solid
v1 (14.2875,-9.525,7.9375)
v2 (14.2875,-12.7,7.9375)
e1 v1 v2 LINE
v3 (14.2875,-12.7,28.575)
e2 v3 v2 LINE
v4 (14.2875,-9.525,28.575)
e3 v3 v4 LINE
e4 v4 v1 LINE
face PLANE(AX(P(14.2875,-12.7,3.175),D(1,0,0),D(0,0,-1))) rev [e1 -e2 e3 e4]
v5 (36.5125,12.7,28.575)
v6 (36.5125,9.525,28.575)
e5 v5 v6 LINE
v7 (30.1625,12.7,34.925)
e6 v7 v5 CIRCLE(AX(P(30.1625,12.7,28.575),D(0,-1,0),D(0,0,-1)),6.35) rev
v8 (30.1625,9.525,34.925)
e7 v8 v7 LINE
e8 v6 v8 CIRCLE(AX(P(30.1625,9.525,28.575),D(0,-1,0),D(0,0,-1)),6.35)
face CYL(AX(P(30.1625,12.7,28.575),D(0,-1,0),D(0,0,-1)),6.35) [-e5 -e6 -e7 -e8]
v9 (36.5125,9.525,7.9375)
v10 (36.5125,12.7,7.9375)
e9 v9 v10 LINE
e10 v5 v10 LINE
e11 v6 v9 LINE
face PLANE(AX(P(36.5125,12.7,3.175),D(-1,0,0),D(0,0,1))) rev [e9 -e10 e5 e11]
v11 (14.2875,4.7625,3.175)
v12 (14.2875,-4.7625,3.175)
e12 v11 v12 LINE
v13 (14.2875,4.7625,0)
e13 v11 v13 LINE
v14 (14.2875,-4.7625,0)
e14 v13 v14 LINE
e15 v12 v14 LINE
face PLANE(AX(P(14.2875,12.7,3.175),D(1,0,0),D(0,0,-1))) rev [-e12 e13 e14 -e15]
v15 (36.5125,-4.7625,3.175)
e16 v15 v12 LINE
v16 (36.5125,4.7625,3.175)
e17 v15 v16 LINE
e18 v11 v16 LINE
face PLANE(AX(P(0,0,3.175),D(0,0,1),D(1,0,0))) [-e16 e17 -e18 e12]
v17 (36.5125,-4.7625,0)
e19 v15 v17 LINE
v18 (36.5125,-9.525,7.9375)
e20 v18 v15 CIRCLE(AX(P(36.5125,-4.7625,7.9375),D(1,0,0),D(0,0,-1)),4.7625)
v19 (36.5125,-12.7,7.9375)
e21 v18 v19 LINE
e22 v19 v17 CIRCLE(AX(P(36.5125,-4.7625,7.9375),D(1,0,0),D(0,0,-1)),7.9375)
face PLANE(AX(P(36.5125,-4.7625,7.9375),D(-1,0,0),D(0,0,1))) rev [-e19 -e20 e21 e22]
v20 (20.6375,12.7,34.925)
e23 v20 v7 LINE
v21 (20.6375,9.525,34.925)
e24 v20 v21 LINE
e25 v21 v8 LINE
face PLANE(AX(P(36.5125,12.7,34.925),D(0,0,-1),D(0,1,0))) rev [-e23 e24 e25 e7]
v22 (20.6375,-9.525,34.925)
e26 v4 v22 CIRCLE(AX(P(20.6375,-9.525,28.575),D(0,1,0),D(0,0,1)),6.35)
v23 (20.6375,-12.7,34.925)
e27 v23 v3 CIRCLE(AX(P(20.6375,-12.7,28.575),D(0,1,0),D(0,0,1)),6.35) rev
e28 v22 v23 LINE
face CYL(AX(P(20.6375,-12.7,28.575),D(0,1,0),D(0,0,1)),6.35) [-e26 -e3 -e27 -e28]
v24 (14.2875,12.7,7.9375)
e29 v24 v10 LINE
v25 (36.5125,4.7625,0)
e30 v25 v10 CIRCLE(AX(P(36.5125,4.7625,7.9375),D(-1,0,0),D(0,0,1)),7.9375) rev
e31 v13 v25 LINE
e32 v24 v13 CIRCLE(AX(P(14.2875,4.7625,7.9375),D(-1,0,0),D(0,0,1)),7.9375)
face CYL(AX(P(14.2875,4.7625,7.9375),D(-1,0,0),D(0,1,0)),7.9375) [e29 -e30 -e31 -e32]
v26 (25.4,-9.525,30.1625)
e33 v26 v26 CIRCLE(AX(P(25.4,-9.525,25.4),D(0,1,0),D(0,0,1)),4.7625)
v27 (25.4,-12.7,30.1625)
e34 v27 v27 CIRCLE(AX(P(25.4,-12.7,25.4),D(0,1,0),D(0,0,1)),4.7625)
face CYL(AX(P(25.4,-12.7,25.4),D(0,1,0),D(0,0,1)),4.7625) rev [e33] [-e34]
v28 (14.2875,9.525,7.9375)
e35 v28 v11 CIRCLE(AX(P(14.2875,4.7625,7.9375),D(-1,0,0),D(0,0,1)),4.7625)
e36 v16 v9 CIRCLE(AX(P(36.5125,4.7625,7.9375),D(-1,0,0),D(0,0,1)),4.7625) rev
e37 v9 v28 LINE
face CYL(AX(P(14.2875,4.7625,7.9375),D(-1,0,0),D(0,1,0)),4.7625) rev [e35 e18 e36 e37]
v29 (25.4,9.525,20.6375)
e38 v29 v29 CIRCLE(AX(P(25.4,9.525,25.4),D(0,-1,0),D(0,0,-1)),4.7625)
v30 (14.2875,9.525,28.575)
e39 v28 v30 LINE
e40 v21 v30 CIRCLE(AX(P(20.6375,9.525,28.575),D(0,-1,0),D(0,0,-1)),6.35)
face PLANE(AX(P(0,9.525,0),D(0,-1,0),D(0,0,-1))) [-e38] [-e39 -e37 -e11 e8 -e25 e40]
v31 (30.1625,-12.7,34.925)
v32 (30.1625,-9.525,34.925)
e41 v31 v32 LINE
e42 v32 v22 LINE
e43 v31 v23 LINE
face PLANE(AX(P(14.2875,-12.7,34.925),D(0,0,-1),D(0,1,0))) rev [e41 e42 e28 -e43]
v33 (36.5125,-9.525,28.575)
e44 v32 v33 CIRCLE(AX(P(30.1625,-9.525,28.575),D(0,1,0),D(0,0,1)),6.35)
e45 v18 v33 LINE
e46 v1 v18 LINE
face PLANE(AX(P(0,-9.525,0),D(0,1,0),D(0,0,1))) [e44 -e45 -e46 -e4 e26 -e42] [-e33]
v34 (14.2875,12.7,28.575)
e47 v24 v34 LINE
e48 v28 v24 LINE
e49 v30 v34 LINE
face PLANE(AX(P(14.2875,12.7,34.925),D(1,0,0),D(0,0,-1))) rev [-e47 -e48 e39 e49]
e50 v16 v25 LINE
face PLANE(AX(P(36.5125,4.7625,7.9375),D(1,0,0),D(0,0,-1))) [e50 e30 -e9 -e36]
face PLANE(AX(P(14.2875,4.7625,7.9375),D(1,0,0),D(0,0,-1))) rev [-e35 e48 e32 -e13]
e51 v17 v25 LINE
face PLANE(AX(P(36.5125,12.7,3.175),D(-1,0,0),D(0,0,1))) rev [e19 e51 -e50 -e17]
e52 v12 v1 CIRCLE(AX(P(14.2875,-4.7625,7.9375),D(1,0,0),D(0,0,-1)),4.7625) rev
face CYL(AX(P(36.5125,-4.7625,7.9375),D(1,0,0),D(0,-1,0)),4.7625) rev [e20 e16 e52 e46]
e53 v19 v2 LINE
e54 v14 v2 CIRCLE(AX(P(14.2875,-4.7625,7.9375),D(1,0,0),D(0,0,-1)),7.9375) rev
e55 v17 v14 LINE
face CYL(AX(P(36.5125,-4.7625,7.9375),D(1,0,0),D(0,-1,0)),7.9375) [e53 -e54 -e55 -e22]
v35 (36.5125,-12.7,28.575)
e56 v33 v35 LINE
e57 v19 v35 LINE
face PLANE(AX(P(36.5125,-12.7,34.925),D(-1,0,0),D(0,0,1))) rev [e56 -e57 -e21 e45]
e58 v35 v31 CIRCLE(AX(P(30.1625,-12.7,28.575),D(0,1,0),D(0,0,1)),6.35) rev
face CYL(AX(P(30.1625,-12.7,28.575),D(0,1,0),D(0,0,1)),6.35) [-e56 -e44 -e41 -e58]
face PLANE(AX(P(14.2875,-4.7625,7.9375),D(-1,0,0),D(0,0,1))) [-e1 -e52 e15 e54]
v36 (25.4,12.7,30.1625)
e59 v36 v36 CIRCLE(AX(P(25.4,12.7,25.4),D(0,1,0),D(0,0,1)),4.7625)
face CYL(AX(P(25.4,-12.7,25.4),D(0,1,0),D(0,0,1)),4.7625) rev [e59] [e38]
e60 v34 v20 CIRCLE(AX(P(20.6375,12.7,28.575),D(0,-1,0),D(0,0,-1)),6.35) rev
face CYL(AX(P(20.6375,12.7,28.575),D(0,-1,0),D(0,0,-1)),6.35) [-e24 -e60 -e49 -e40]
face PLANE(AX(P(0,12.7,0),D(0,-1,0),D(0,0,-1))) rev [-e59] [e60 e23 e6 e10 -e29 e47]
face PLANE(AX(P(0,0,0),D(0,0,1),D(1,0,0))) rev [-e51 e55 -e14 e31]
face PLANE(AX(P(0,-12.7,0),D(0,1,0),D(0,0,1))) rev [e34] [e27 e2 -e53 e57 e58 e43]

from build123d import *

# Parameters (mm, degrees)
SKETCH12_W                     = 22.225
SKETCH12_H                     = 25.4
BASE_FLANGE2_DEPTH             = 3.175
EDGE_FLANGE2_STRIP_W           = 22.225
EDGE_FLANGE2_STRIP_H           = 3.175
EDGE_FLANGE2_STRIP_CUT_DEPTH   = 22.225
EDGE_FLANGE2_STRIP_2_W         = 22.225
EDGE_FLANGE2_STRIP_2_H         = 3.175
EDGE_FLANGE2_STRIP_CUT_2_DEPTH = 22.225
EDGE_FLANGE2_DEPTH             = 22.225
EDGE_FLANGE2_BEND_DEPTH        = 22.225
CUT_EXTRUDE1_DEPTH             = 53.098064084
CUT_EXTRUDE1_DEPTH_BACK        = 53.098064084
SKETCH23_R                     = 4.7625
BREAK_CORNER1_START            = -12.7
BREAK_CORNER1_DEPTH            = 25.4


# Read off the part's stored shape, not the designer's step: Break-Corner1
# Sheet-metal steps are written as plain solids
with BuildPart() as part:
    # Sketch12 → Base-Flange2 (new body)
    with BuildSketch(Plane.XY):
        with Locations((25.4, 0)):
            Rectangle(SKETCH12_W, SKETCH12_H)
    extrude(amount=BASE_FLANGE2_DEPTH)

    # Edge-Flange2 strip (across the edge) → Edge-Flange2 strip cut (cut)
    with BuildSketch(Plane(origin=(36.5125, 12.7, 3.175), x_dir=(0, -1, 0), z_dir=(-1, 0, 0))):
        with Locations((-3.175, -1.5875)):
            Rectangle(EDGE_FLANGE2_STRIP_W, EDGE_FLANGE2_STRIP_H)
    extrude(amount=EDGE_FLANGE2_STRIP_CUT_DEPTH, mode=Mode.SUBTRACT)

    # Edge-Flange2 strip 2 (across the edge) → Edge-Flange2 strip cut 2 (cut)
    with BuildSketch(Plane(origin=(14.2875, -12.7, 3.175), x_dir=(0, 1, 0), z_dir=(1, 0, 0))):
        with Locations((-3.175, -1.5875)):
            Rectangle(EDGE_FLANGE2_STRIP_2_W, EDGE_FLANGE2_STRIP_2_H)
    extrude(amount=EDGE_FLANGE2_STRIP_CUT_2_DEPTH, mode=Mode.SUBTRACT)

    # Edge-Flange2 section (across the edge) → Edge-Flange2 (add)
    with BuildSketch(Plane(origin=(36.5125, 12.7, 3.175), x_dir=(0, -1, 0), z_dir=(-1, 0, 0))):
        with BuildLine():
            Line((0, 4.7625), (0, 31.75))
            Line((0, 31.75), (3.175, 31.75))
            Line((3.175, 31.75), (3.175, 4.7625))
            ThreePointArc((3.175, 4.7625), (4.569903955, 1.394903955), (7.9375, 0))
            Line((7.9375, 0), (7.9375, -3.175))
            ThreePointArc((7.9375, -3.175), (2.324839924, -0.850160076), (0, 4.7625))
        make_face()
    extrude(amount=EDGE_FLANGE2_DEPTH)

    # Edge-Flange2 section 2 (across the edge) → Edge-Flange2 bend (add)
    with BuildSketch(Plane(origin=(14.2875, -12.7, 3.175), x_dir=(0, 1, 0), z_dir=(1, 0, 0))):
        with BuildLine():
            Line((0, 4.7625), (0, 31.75))
            Line((0, 31.75), (3.175, 31.75))
            Line((3.175, 31.75), (3.175, 4.7625))
            ThreePointArc((3.175, 4.7625), (4.569903955, 1.394903955), (7.9375, 0))
            Line((7.9375, 0), (7.9375, -3.175))
            ThreePointArc((7.9375, -3.175), (2.324839924, -0.850160076), (0, 4.7625))
        make_face()
    extrude(amount=EDGE_FLANGE2_BEND_DEPTH)

    # Sketch23 → Cut-Extrude1 (cut, two sides: drawn at the far end of the back side and taken through both)
    with BuildSketch(Plane(origin=(0, 0, 0), x_dir=(1, 0, 0), z_dir=(0, 1, 0)).offset(-CUT_EXTRUDE1_DEPTH_BACK)):
        with Locations(Location((25.4, -25.4, 0), (0, 0, 270))):
            Circle(SKETCH23_R)
    extrude(amount=CUT_EXTRUDE1_DEPTH + CUT_EXTRUDE1_DEPTH_BACK, mode=Mode.SUBTRACT)

    # Break-Corner1 outline → Break-Corner1 (cut)
    with BuildSketch(Plane(origin=(0, 0, 0), x_dir=(1, 0, 0), z_dir=(0, 1, 0)).offset(BREAK_CORNER1_START)):
        with BuildLine():
            Line((36.5125, -34.925), (36.5125, -28.575))
            ThreePointArc((36.5125, -28.575), (34.652628061, -33.065128061), (30.1625, -34.925))
            Line((30.1625, -34.925), (36.5125, -34.925))
        make_face()
        with BuildLine():
            Line((14.2875, -34.925), (20.6375, -34.925))
            ThreePointArc((20.6375, -34.925), (16.147371939, -33.065128061), (14.2875, -28.575))
            Line((14.2875, -28.575), (14.2875, -34.925))
        make_face()
    extrude(amount=BREAK_CORNER1_DEPTH, mode=Mode.SUBTRACT)


solid = part.part
